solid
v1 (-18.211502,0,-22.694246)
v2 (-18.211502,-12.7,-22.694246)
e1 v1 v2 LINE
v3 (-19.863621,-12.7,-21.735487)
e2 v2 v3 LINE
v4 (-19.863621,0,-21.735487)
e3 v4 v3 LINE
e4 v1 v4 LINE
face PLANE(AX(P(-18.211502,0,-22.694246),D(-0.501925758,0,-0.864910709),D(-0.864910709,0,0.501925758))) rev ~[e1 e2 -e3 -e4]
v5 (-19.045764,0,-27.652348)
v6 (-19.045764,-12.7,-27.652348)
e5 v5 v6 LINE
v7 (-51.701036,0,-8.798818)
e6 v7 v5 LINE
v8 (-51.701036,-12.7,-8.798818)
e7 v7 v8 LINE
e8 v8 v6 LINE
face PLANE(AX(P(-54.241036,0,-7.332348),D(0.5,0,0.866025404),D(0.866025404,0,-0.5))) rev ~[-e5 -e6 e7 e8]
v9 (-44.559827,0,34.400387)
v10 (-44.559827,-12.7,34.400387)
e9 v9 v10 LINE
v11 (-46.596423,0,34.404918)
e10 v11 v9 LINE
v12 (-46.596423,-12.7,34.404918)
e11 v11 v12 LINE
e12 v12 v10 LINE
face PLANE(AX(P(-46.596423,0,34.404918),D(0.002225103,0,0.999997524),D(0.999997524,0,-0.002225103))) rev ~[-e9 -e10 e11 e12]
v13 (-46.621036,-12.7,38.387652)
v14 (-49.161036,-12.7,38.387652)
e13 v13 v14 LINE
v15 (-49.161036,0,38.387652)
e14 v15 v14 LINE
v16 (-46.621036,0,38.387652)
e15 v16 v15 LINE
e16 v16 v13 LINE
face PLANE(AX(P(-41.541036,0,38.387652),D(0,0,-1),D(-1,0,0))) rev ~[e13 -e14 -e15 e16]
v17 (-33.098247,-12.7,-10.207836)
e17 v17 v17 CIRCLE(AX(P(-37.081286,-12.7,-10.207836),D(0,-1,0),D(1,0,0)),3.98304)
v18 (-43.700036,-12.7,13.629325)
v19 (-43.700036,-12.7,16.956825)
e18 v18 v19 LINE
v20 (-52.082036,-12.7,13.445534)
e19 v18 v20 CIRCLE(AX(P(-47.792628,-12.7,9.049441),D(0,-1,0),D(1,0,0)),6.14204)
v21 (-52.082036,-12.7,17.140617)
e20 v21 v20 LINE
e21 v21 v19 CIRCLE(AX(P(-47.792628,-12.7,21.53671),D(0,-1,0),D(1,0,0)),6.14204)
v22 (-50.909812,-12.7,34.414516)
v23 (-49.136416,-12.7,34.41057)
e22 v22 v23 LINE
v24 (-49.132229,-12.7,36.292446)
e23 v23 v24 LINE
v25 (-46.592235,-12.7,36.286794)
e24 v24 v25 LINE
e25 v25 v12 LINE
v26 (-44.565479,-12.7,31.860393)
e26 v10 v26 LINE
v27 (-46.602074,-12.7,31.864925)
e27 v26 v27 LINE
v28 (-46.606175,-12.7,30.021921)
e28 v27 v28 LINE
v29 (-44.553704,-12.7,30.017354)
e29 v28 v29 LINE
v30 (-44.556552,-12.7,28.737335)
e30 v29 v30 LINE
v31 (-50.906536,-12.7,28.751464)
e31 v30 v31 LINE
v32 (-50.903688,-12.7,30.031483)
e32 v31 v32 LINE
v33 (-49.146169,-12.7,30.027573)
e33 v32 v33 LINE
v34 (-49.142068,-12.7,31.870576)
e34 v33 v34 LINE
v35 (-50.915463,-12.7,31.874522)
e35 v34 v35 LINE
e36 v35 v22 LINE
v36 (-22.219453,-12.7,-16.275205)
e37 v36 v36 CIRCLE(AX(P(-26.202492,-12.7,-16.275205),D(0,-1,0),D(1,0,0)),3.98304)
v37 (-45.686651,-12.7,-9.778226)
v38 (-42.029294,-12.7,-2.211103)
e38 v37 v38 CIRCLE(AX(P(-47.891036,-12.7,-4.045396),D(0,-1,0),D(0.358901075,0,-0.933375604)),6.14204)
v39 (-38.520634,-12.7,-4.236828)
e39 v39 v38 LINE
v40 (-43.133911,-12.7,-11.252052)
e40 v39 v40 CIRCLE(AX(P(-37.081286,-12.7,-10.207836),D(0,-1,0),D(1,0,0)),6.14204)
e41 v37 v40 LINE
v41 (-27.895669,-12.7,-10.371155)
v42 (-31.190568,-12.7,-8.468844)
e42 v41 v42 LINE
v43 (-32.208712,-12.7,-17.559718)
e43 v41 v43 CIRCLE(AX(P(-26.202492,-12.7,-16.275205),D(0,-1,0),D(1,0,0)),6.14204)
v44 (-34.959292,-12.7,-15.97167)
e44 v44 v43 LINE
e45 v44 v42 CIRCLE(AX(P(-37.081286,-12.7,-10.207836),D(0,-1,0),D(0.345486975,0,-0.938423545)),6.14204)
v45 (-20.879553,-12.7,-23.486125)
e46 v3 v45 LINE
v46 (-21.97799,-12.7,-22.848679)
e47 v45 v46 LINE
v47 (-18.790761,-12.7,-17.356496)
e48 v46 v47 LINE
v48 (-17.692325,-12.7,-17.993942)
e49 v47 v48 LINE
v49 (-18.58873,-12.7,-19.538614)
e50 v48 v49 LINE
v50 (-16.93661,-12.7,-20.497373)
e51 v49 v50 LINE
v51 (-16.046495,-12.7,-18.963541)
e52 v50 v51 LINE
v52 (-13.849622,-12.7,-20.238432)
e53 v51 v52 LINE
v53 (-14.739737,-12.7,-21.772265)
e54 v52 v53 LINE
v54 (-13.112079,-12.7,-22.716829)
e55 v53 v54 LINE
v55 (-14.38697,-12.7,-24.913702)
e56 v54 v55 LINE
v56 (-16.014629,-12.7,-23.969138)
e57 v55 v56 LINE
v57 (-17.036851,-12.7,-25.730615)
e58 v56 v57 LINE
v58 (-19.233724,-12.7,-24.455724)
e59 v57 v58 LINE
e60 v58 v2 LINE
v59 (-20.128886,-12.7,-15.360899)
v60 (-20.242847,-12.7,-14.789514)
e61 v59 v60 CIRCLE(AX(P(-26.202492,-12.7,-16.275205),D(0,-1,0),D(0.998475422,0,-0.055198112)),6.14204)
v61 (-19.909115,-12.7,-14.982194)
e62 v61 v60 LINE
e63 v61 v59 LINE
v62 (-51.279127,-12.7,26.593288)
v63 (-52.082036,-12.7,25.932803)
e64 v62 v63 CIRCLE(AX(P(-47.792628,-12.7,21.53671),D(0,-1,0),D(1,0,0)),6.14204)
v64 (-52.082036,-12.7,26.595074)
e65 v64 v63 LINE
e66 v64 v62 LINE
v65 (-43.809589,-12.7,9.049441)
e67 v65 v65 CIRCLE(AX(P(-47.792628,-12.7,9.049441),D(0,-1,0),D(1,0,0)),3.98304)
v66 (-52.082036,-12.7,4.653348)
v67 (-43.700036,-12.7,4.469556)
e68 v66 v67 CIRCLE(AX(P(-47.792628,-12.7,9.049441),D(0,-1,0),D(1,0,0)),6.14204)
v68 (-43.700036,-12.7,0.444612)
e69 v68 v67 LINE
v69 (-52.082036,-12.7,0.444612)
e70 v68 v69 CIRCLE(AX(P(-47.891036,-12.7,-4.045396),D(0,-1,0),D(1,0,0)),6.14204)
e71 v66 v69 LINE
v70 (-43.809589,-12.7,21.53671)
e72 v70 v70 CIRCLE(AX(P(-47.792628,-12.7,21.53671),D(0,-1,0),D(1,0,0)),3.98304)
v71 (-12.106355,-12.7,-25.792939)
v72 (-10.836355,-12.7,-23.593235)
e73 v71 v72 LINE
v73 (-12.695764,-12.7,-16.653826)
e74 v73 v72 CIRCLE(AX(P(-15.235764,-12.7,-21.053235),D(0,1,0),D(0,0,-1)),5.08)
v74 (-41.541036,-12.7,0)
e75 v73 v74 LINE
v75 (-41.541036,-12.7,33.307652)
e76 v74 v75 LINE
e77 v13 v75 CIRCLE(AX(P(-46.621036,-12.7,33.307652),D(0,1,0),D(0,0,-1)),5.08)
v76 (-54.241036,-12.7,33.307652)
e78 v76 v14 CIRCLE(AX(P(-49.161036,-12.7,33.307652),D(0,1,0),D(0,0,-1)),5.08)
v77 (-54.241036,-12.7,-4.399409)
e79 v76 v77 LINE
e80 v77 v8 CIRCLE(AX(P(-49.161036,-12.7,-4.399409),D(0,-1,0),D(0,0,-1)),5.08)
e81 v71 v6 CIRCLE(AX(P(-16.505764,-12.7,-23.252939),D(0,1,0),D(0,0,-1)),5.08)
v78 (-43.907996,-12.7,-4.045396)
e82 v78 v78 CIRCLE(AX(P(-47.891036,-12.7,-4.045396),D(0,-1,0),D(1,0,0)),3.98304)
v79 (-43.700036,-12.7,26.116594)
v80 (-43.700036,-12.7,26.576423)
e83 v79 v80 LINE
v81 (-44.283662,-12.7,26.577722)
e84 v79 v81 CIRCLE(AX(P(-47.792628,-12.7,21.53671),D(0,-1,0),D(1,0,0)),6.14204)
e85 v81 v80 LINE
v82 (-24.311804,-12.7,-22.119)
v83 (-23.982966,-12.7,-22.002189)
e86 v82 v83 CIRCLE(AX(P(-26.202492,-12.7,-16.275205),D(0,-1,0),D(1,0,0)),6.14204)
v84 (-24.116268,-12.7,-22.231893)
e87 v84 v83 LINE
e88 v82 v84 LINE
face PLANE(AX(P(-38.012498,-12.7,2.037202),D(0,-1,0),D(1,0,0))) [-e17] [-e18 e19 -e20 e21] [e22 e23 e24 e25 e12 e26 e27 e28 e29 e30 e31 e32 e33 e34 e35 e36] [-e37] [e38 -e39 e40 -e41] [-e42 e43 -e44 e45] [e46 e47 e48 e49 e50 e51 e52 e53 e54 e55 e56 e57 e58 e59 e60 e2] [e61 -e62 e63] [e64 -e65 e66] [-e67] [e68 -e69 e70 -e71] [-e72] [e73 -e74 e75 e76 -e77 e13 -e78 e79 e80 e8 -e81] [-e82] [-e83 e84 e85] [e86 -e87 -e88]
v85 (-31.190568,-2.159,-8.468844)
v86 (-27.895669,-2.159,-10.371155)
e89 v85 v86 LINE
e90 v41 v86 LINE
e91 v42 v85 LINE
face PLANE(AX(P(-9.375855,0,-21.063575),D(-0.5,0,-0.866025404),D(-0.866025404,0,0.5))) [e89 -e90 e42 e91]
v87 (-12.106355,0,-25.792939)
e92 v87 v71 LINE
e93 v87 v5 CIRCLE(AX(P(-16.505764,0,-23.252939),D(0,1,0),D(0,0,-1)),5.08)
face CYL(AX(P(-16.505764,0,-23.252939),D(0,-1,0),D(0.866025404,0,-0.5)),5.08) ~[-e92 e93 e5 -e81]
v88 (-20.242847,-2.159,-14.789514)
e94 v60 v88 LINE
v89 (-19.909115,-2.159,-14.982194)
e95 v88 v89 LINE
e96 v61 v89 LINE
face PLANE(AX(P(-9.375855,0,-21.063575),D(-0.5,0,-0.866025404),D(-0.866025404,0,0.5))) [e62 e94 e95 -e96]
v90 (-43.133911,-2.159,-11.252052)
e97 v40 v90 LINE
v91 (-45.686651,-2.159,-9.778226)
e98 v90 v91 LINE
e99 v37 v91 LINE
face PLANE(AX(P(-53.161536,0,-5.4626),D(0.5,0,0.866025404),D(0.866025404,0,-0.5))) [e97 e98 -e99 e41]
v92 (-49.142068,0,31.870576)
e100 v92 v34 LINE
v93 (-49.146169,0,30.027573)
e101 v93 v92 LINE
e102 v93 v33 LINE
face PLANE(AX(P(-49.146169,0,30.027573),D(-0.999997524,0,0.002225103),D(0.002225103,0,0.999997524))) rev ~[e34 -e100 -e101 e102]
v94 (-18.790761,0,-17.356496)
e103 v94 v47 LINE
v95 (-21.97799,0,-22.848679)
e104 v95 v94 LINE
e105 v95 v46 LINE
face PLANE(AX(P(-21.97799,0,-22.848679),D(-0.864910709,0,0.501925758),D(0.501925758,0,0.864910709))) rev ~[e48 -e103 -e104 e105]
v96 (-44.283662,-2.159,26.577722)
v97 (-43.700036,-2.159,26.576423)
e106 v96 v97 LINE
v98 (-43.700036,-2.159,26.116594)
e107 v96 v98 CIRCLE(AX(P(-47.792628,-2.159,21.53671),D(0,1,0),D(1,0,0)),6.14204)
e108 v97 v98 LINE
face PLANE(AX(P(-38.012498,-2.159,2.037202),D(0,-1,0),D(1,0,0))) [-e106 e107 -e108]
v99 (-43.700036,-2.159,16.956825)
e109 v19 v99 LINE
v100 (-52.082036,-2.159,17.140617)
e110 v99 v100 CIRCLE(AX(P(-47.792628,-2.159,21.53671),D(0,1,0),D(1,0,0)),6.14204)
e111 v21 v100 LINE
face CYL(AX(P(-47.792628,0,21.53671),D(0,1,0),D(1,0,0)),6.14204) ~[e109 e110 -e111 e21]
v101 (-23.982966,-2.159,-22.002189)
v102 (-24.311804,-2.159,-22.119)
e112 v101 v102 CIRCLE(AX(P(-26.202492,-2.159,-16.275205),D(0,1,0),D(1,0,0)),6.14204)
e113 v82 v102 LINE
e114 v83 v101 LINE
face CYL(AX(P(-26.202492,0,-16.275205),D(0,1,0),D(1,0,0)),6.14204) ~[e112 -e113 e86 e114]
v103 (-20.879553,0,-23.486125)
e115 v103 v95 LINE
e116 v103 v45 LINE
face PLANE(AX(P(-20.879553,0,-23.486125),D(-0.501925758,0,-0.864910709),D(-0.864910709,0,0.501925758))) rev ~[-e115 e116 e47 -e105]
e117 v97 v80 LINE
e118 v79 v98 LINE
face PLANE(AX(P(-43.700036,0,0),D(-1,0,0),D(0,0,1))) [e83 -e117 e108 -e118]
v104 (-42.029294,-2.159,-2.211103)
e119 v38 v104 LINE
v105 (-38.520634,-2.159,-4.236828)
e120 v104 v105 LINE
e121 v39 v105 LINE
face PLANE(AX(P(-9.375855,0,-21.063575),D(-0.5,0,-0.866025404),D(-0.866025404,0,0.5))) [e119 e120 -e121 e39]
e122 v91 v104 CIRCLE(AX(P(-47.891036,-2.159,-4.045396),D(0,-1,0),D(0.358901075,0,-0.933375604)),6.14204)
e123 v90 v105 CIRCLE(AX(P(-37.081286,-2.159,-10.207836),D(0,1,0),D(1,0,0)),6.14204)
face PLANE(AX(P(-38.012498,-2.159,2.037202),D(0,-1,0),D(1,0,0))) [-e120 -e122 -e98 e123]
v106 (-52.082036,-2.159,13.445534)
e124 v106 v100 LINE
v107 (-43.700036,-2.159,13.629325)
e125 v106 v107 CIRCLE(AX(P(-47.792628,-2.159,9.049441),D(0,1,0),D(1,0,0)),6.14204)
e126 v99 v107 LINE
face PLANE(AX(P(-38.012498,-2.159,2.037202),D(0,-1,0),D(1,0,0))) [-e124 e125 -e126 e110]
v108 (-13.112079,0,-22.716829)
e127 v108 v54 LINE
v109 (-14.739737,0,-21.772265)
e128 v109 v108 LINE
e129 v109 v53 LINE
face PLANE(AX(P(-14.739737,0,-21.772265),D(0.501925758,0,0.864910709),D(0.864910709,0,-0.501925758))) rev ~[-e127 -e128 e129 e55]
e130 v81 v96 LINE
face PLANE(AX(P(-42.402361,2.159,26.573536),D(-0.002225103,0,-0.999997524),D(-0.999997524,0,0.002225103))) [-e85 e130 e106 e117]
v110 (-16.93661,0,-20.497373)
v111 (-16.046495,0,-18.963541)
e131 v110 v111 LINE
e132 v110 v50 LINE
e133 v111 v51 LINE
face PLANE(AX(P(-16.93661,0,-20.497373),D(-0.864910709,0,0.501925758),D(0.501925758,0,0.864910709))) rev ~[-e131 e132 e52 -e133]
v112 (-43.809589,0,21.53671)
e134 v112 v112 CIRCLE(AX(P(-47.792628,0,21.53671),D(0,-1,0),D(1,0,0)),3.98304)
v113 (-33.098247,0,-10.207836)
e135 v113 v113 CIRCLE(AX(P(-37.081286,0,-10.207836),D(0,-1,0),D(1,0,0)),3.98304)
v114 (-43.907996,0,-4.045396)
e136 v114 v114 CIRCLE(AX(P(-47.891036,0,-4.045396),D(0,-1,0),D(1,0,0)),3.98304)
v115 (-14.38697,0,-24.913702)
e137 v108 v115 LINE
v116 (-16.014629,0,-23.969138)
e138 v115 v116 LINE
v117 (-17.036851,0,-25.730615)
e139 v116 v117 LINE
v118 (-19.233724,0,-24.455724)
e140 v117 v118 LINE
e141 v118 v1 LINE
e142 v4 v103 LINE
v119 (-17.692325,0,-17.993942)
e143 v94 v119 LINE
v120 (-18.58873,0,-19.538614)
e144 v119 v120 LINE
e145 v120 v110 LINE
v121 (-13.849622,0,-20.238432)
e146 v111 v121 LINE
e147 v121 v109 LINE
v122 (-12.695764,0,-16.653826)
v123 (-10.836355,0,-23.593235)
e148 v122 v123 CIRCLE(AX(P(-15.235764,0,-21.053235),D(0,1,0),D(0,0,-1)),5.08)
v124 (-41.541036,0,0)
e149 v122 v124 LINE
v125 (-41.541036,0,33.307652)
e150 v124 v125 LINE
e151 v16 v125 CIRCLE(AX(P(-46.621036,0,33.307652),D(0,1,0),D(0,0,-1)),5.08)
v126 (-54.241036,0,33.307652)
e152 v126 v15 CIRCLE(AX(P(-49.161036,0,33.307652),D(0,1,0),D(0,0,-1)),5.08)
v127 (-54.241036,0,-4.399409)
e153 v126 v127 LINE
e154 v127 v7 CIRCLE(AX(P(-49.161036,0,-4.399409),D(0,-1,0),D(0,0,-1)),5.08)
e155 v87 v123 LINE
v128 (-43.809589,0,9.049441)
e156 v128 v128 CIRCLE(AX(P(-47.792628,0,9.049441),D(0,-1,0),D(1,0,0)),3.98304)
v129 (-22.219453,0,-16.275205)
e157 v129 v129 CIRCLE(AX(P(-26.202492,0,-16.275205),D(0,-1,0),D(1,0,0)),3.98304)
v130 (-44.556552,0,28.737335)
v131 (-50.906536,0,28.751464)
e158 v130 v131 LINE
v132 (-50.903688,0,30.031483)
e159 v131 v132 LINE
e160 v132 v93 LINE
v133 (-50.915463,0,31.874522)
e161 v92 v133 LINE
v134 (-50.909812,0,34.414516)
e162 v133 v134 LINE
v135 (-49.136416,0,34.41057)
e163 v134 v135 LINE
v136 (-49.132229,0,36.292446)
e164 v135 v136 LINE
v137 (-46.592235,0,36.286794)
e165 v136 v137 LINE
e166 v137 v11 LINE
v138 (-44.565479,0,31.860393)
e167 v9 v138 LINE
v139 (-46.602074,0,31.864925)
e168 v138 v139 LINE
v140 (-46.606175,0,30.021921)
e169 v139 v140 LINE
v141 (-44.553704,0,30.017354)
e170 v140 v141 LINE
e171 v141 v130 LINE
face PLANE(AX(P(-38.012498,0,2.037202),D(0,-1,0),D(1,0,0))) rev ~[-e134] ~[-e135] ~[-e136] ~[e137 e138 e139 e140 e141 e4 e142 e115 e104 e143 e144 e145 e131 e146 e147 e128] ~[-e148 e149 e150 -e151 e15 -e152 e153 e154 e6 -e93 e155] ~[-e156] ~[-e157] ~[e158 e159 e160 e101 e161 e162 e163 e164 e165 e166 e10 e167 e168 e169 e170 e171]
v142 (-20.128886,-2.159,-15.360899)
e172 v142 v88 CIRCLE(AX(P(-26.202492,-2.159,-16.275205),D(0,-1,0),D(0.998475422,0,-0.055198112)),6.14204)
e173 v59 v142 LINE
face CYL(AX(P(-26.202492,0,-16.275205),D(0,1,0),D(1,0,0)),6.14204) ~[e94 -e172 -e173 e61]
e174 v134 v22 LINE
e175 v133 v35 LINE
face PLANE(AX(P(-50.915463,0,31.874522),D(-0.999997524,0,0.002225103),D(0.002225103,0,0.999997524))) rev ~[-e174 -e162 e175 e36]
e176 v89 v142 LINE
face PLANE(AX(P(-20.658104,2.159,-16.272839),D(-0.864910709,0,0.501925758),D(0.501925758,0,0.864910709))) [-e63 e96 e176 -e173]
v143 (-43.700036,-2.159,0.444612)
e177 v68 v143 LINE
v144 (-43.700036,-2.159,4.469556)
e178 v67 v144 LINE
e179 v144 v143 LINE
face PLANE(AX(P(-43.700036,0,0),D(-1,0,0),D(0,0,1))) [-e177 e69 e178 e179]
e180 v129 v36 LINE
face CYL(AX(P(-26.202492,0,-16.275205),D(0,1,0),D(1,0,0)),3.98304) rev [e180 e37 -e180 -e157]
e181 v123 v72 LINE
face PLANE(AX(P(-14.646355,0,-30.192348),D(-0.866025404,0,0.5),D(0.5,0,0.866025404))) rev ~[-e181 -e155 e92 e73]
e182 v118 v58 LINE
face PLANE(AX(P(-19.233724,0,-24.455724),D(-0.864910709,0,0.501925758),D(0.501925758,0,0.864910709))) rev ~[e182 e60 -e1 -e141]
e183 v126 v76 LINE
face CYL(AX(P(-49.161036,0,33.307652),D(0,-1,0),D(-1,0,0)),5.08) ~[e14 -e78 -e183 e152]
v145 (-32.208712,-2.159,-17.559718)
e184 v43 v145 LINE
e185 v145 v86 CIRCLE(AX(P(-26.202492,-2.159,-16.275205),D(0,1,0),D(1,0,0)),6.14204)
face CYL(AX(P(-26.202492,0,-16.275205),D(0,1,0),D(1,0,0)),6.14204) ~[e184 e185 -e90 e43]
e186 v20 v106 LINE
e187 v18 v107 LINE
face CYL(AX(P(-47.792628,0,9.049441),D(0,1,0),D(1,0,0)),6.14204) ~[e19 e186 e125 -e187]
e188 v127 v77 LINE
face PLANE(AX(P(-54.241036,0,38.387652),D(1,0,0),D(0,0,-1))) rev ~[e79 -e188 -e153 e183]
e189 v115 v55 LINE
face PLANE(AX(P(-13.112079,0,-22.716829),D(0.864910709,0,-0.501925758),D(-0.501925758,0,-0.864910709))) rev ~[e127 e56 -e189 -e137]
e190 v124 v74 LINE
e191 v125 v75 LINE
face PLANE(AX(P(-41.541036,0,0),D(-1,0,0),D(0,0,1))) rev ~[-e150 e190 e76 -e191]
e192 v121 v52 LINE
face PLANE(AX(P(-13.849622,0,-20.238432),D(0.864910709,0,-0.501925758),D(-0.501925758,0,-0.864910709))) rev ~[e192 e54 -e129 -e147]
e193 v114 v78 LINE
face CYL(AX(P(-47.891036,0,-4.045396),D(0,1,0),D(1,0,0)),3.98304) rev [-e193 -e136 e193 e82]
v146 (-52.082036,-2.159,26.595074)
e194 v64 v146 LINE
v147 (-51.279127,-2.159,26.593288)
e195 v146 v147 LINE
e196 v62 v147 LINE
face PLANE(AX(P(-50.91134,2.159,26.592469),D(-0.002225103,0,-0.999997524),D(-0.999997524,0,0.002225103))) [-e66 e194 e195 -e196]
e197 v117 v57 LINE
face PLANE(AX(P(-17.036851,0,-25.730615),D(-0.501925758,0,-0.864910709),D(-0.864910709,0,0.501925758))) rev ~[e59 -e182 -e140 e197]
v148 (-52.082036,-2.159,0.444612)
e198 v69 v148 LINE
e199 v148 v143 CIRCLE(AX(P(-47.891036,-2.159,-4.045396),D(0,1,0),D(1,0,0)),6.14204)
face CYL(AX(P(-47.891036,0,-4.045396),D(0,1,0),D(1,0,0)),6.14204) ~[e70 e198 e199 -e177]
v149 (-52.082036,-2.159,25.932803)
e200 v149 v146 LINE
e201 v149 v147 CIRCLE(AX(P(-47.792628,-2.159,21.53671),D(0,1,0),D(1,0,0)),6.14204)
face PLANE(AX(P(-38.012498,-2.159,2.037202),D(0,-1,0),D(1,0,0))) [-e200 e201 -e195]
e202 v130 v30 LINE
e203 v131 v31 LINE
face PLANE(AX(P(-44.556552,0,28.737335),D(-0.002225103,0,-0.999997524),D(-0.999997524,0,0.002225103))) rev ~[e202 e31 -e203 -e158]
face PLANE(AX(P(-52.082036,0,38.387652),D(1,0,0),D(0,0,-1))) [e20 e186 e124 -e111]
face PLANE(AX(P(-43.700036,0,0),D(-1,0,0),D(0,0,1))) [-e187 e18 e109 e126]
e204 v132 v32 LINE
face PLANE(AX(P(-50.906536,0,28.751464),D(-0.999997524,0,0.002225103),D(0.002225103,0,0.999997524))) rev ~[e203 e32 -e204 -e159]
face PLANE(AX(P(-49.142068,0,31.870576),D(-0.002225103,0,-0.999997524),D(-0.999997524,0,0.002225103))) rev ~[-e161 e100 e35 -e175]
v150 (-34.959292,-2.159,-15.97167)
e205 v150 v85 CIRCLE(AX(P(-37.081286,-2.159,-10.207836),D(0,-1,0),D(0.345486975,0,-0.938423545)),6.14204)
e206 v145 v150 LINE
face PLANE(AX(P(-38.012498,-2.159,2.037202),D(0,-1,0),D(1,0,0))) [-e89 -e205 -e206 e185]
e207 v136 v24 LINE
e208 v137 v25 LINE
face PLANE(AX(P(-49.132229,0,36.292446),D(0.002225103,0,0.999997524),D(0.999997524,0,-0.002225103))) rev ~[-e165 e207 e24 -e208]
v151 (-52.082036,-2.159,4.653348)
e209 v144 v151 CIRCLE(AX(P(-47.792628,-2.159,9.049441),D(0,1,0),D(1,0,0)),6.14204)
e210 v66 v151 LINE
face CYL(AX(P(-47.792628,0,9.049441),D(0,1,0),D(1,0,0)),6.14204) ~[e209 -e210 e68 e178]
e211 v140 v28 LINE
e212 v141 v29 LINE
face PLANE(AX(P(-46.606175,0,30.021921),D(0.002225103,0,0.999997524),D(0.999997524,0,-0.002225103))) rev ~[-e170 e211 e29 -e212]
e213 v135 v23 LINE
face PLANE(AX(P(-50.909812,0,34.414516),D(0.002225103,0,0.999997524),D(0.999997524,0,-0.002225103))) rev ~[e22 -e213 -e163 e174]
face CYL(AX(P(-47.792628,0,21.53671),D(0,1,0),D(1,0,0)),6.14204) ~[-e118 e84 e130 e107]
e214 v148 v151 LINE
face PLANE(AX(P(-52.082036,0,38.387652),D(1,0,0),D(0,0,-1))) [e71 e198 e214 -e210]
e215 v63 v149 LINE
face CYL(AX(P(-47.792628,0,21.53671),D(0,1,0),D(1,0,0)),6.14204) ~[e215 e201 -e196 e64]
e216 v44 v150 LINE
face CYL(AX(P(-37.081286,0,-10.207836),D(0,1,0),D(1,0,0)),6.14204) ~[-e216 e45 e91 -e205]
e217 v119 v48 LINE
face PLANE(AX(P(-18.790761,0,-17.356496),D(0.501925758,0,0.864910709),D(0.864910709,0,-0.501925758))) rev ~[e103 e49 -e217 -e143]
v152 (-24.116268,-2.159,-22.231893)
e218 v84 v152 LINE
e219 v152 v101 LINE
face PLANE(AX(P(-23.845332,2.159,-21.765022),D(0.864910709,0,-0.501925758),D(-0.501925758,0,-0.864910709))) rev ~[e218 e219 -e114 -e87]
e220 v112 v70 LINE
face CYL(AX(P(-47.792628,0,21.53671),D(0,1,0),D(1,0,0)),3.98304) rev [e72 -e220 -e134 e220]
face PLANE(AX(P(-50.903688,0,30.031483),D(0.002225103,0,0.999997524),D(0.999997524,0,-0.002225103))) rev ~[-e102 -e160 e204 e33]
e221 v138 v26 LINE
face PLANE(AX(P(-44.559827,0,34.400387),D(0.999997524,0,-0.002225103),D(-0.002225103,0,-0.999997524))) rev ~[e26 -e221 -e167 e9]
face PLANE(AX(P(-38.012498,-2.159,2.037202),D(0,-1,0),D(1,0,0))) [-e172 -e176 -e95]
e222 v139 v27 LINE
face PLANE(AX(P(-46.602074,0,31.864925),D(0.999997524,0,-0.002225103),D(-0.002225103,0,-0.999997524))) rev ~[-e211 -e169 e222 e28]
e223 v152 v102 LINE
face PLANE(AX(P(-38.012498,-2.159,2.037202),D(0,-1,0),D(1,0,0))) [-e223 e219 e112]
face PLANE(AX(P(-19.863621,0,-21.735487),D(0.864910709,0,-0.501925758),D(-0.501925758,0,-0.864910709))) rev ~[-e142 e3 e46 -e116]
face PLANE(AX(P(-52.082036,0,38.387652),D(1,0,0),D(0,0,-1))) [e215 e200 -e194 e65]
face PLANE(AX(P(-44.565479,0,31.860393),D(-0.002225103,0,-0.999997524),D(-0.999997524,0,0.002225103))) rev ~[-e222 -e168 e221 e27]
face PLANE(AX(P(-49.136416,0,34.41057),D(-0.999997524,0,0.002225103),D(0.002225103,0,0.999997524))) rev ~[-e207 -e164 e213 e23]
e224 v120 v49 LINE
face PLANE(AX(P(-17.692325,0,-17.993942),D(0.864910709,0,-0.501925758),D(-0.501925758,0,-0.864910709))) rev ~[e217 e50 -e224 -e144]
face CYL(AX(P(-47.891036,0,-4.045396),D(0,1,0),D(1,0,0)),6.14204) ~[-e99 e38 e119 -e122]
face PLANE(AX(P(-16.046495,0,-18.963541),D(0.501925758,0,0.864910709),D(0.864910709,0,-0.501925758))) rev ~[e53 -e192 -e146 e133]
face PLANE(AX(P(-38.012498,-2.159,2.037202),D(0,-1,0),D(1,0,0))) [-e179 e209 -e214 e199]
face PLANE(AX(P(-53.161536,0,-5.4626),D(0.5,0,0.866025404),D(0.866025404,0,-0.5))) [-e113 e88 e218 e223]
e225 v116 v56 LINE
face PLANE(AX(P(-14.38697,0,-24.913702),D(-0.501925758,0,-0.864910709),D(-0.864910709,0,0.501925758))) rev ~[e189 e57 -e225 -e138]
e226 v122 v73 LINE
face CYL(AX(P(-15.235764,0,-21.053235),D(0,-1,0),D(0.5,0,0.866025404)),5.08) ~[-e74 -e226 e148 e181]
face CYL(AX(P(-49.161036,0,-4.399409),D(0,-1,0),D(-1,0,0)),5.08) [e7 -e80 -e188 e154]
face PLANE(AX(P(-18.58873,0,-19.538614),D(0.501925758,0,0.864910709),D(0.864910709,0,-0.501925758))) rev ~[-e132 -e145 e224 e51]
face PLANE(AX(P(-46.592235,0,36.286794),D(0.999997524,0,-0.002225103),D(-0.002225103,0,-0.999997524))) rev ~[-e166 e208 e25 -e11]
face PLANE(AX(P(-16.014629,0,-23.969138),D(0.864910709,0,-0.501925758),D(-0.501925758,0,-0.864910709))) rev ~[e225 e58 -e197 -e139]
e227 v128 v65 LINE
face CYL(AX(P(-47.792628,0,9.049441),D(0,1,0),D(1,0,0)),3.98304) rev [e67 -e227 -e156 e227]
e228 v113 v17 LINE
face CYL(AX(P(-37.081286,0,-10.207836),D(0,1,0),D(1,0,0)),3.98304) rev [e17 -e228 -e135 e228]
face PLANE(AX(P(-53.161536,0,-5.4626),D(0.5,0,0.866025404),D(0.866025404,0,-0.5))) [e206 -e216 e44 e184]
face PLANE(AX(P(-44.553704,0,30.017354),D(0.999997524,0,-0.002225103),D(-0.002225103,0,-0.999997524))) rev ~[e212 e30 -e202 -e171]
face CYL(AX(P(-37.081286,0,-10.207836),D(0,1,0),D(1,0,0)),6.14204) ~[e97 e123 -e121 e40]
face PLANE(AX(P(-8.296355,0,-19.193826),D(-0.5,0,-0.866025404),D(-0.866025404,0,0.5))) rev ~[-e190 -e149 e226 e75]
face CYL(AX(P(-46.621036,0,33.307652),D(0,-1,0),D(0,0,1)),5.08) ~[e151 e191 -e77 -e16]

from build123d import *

# Parameters (mm, degrees)
F0_R        = 4.7450397895
F0_R_2      = 3.9830397895
F1_DEPTH    = 12.7
F2_R        = 5.08
F3_R        = 5.08
F4_R        = 5.08
F5_R        = 5.08
F6_R        = 5.08
F7_T        = 2.159
F7_T3_DEPTH = 17.018


# Not quite as in the source:
# - a shell that OpenCascade refuses in one call is made with other operations: the cavity is built on its own and cut out


with BuildPart() as f1:
    # F0 (on Front) → F1 (new body)
    with BuildSketch(Plane.XZ):
        Polygon((-41.5410360719, 38.3876515813), (-54.2410360719, 38.3876515813), (-54.2410360719, -7.3323484187), (-14.6463546109, -30.1923484187), (-8.2963546109, -19.1938257906), (-41.5410360719, 0), align=None)
        with Locations((-47.8910360719, -4.0453961561)):
            Circle(F0_R, mode=Mode.SUBTRACT)
        with Locations((-37.0812863111, -10.2078355849)):
            Circle(F0_R, mode=Mode.SUBTRACT)
        with Locations((-26.2024924159, -16.2752047181)):
            Circle(F0_R, mode=Mode.SUBTRACT)
        Polygon((-16.936610418, -20.4973731492), (-16.0464954671, -18.9635408218), (-13.8496222672, -20.238432246), (-14.7397372181, -21.7722645735), (-13.1120789848, -22.7168286582), (-14.386970409, -24.9137018581), (-16.0146286424, -23.9691377734), (-17.0368508278, -25.7306152458), (-19.2337240277, -24.4557238215), (-18.2115018423, -22.6942463491), (-19.8636214544, -21.7354868152), (-20.8795533344, -23.4861249306), (-21.9779899344, -22.8486792184), (-18.7907613738, -17.3564962187), (-17.6923247738, -17.9939419308), (-18.5887300301, -19.5386136153), align=None, mode=Mode.SUBTRACT)
        with Locations((-47.7926284075, 9.0494407341)):
            Circle(F0_R, mode=Mode.SUBTRACT)
        with Locations((-47.7926284075, 21.5367097408)):
            Circle(F0_R, mode=Mode.SUBTRACT)
        Polygon((-49.1420680823, 31.8705764772), (-50.9154633185, 31.8745224733), (-50.909811558, 34.4145161854), (-49.1364163218, 34.4105701893), (-49.1322289456, 36.2924456105), (-46.5922352335, 36.2867938499), (-46.5964226097, 34.4049184288), (-44.5598272777, 34.4003867841), (-44.5654790382, 31.860393072), (-46.6020743702, 31.8649247167), (-46.6061752529, 30.0219208878), (-44.5537036309, 30.0173539166), (-44.5565518125, 28.7373345026), (-50.9065360928, 28.7514639039), (-50.9036879112, 30.0314833179), (-49.146168965, 30.0275726483), align=None, mode=Mode.SUBTRACT)
        with Locations((-47.7926284075, 21.5367097408)):
            Circle(F0_R)
        with Locations((-47.7926284075, 21.5367097408)):
            Circle(F0_R_2, mode=Mode.SUBTRACT)
        with Locations((-47.7926284075, 9.0494407341)):
            Circle(F0_R)
        with Locations((-47.7926284075, 9.0494407341)):
            Circle(F0_R_2, mode=Mode.SUBTRACT)
        with Locations((-47.8910360719, -4.0453961561)):
            Circle(F0_R)
        with Locations((-47.8910360719, -4.0453961561)):
            Circle(F0_R_2, mode=Mode.SUBTRACT)
        with Locations((-37.0812863111, -10.2078355849)):
            Circle(F0_R)
        with Locations((-37.0812863111, -10.2078355849)):
            Circle(F0_R_2, mode=Mode.SUBTRACT)
        with Locations((-26.2024924159, -16.2752047181)):
            Circle(F0_R)
        with Locations((-26.2024924159, -16.2752047181)):
            Circle(F0_R_2, mode=Mode.SUBTRACT)
    extrude(amount=F1_DEPTH)

    # F2
    f2_edges = [f1.edges().sort_by_distance(p)[0] for p in [
        (-8.296355, -6.35, -19.193826),
    ]]
    fillet(f2_edges, radius=F2_R)

    # F3
    f3_edges = [f1.edges().sort_by_distance(p)[0] for p in [
        (-14.646355, -6.35, -30.192348),
    ]]
    fillet(f3_edges, radius=F3_R)

    # F4
    f4_edges = [f1.edges().sort_by_distance(p)[0] for p in [
        (-54.241036, -6.35, 38.387652),
    ]]
    fillet(f4_edges, radius=F4_R)

    # F5
    f5_edges = [f1.edges().sort_by_distance(p)[0] for p in [
        (-41.541036, -6.35, 38.387652),
    ]]
    fillet(f5_edges, radius=F5_R)

    # F6
    f6_edges = [f1.edges().sort_by_distance(p)[0] for p in [
        (-54.241036, -6.35, -7.332348),
    ]]
    fillet(f6_edges, radius=F6_R)

    # F7: shell of thickness 2.159, made by hand


with BuildPart() as f7_core1:
    # F7_t2: copy of F1
    add(f1.part)

    # the walls: a layer under each face that stays
    f7_faces = [f7_core1.faces().sort_by_distance(p)[0] for p in [
        (-46.8934906703, 0, 5.0273561069),
        (-54.2410360719, -6.35, 14.454121265),
        (-53.5604451231, -6.35, -6.9394090512),
        (-52.7531385203, -6.35, 36.8997540297),
        (-35.373399867, -6.35, -18.2255832606),
        (-47.8910360719, -6.35, 38.3876515813),
        (-15.190962913, -6.35, -28.159842565),
        (-43.0289336235, -6.35, 36.8997540297),
        (-11.4713546109, -6.35, -24.6930871047),
        (-41.5410360719, -6.35, 16.6538257906),
        (-10.3288604645, -6.35, -19.7384340928),
        (-27.118399867, -6.35, -8.3269128953),
        (-51.775668197, -6.35, 21.5367097408),
        (-20.3843756541, -6.35, -20.1025877186),
        (-18.2415430738, -6.35, -17.6752190748),
        (-18.140527402, -6.35, -18.7662777731),
        (-17.7626702241, -6.35, -20.0179933823),
        (-16.4915529426, -6.35, -19.7304569855),
        (-14.9480588672, -6.35, -19.6009865339),
        (-14.2946797427, -6.35, -21.0053484098),
        (-13.9259081015, -6.35, -22.2445466159),
        (-13.7495246969, -6.35, -23.8152652582),
        (-15.2007995257, -6.35, -24.4414198157),
        (-16.5257397351, -6.35, -24.8498765096),
        (-18.1352874278, -6.35, -25.0931695336),
        (-18.722612935, -6.35, -23.5749850853),
        (-19.0375616483, -6.35, -22.2148665822),
        (-20.3715873944, -6.35, -22.6108058729),
        (-21.4287716344, -6.35, -23.1674020745),
        (-46.6041248116, -6.35, 30.9434228022),
        (-45.5799394419, -6.35, 30.0196374022),
        (-44.5551277217, -6.35, 29.3773442096),
        (-47.7315439526, -6.35, 28.7443992033),
        (-50.905112002, -6.35, 29.3914736109),
        (-50.0249284381, -6.35, 30.0295279831),
        (-49.1441185237, -6.35, 30.9490745627),
        (-50.0287657004, -6.35, 31.8725494752),
        (-50.9126374382, -6.35, 33.1445193293),
        (-50.0231139399, -6.35, 34.4125431874),
        (-49.1343226337, -6.35, 35.3515078999),
        (-47.8622320896, -6.35, 36.2896197302),
        (-46.5943289216, -6.35, 35.3458561394),
        (-45.5781249437, -6.35, 34.4026526065),
        (-44.562653158, -6.35, 33.130389928),
        (-45.5837767042, -6.35, 31.8626588943),
        (-51.8740758614, -6.35, -4.0453961561),
        (-41.0643261006, -6.35, -10.2078355849),
        (-51.775668197, -6.35, 9.0494407341),
        (-30.1855322054, -6.35, -16.2752047181),
    ]]
    thicken(f7_faces, amount=-F7_T, mode=Mode.SUBTRACT)

    # F7_s4 → F7_t3 (cut)
    with BuildSketch(Plane.XZ.offset(-2.159)):
        Polygon((-41.5086510719, 0.0186974885), (-43.7000360719, 0), (-43.7000360719, -1.2464992312), (-42.6205360719, -1.8697488468), align=None)
        Polygon((-21.9484799351, -22.8408423733), (-23.8453321543, -21.7650215078), (-24.9289898649, -23.6323637277), (-23.061647645, -24.7160214383), align=None)
        Polygon((-18.7829245287, -17.386006218), (-20.6581035937, -16.2728385081), (-19.5744458831, -14.4054962882), (-17.7071036632, -15.4891539988), align=None)
        Polygon((-17.7218347731, -18.0017787759), (-16.6086670632, -16.1265997109), (-14.7413248433, -17.2102574215), (-15.8249825539, -19.0775996414), align=None)
        Polygon((-16.038658622, -18.9930508211), (-17.913837687, -17.8798831112), (-16.8301799764, -16.0125408913), (-14.9628377565, -17.0961986019), align=None)
        Polygon((-13.8791322665, -20.2462690911), (-12.7659645566, -18.3710900261), (-10.8986223367, -19.4547477367), (-11.9822800473, -21.3220899566), align=None)
        Polygon((-13.1415889841, -22.7246655033), (-12.0284212742, -20.8494864383), (-10.1610790543, -21.9331441489), (-11.2447367649, -23.8004863688), align=None)
        Polygon((-14.3948072541, -24.8841918588), (-12.5196281891, -25.9973595687), (-13.6032858997, -27.8647017886), (-15.4706281196, -26.781044078), align=None)
        Polygon((-17.0446876729, -25.7011052464), (-15.1695086079, -26.8142729564), (-16.2531663185, -28.6816151763), (-18.1205085384, -27.5979574657), align=None)
        Polygon((-19.2042140284, -24.4478869764), (-20.3173817383, -26.3230660414), (-22.1847239582, -25.2394083308), (-21.1010662476, -23.3720661109), align=None)
        Polygon((-20.8873901795, -23.4566149313), (-19.0122111145, -24.5697826412), (-20.0958688251, -26.4371248611), (-21.963211045, -25.3534671505), align=None)
        Polygon((-44.5753416174, 29.99581201), (-44.5488996345, 32.1763485719), (-42.3899049792, 32.1715445754), (-42.3947089756, 30.0125499201), align=None)
        Polygon((-44.578093719, 28.7589724891), (-42.3975571572, 28.7325305062), (-42.4023611536, 26.5735358509), (-44.5613558089, 26.5783398473), align=None)
        Polygon((-50.8848981062, 28.7730058105), (-50.9113400892, 26.5924692486), (-53.0703347445, 26.597273245), (-53.0655307481, 28.7562679003), align=None)
        Polygon((-50.8821460046, 30.0098453313), (-53.0626825665, 30.0362873143), (-53.0578785701, 32.1952819696), (-50.8988839148, 32.1904779732), align=None)
        Polygon((-50.893825332, 31.8960643799), (-50.9202673149, 29.715527818), (-53.0792619702, 29.7203318144), (-53.0744579738, 31.8793264697), align=None)
        Polygon((-50.8882696514, 34.3928781989), (-53.0688062133, 34.4193201818), (-53.0640022169, 36.5783148371), (-50.9050075616, 36.5735108407), align=None)
        Polygon((-49.110687039, 36.2708076239), (-51.2912236009, 36.2972496069), (-51.2864196045, 38.4562442622), (-49.1274249492, 38.4514402658), align=None)
        Polygon((-46.61387322, 36.2652519434), (-46.5874312371, 38.4457885052), (-44.4284365818, 38.4409845088), (-44.4332405782, 36.2819898535), align=None)
        Polygon((-44.5814652642, 34.3788448775), (-44.5550232813, 36.5593814394), (-42.396028626, 36.554577443), (-42.4008326224, 34.3955827877), align=None)
        Polygon((-44.5870209448, 31.8820310585), (-42.4064843829, 31.8555890755), (-42.4112883793, 29.6965944202), (-44.5702830346, 29.7013984167), align=None)
    extrude(amount=F7_T3_DEPTH, mode=Mode.SUBTRACT)


with BuildPart() as f1_1:
    add(f1.part)

    # what is left inside the walls is the cavity
    f7_cavity = [f7_core1.part.solids().sort_by_distance(p)[0] for p in [
        (-51.708298, -9.186333, 26.296738),
        (-47.927745, -9.186333, 15.211589),
        (-47.927745, -9.186333, 2.887292),
        (-42.341594, -9.186333, -6.727564),
        (-43.971477, -9.186333, 26.372941),
        (-20.157914, -9.186333, -15.069631),
        (-31.573461, -9.186333, -12.974456),
        (-24.139328, -9.186333, -22.083275),
    ]]
    add(f7_cavity, mode=Mode.SUBTRACT)


solid = f1_1.part
